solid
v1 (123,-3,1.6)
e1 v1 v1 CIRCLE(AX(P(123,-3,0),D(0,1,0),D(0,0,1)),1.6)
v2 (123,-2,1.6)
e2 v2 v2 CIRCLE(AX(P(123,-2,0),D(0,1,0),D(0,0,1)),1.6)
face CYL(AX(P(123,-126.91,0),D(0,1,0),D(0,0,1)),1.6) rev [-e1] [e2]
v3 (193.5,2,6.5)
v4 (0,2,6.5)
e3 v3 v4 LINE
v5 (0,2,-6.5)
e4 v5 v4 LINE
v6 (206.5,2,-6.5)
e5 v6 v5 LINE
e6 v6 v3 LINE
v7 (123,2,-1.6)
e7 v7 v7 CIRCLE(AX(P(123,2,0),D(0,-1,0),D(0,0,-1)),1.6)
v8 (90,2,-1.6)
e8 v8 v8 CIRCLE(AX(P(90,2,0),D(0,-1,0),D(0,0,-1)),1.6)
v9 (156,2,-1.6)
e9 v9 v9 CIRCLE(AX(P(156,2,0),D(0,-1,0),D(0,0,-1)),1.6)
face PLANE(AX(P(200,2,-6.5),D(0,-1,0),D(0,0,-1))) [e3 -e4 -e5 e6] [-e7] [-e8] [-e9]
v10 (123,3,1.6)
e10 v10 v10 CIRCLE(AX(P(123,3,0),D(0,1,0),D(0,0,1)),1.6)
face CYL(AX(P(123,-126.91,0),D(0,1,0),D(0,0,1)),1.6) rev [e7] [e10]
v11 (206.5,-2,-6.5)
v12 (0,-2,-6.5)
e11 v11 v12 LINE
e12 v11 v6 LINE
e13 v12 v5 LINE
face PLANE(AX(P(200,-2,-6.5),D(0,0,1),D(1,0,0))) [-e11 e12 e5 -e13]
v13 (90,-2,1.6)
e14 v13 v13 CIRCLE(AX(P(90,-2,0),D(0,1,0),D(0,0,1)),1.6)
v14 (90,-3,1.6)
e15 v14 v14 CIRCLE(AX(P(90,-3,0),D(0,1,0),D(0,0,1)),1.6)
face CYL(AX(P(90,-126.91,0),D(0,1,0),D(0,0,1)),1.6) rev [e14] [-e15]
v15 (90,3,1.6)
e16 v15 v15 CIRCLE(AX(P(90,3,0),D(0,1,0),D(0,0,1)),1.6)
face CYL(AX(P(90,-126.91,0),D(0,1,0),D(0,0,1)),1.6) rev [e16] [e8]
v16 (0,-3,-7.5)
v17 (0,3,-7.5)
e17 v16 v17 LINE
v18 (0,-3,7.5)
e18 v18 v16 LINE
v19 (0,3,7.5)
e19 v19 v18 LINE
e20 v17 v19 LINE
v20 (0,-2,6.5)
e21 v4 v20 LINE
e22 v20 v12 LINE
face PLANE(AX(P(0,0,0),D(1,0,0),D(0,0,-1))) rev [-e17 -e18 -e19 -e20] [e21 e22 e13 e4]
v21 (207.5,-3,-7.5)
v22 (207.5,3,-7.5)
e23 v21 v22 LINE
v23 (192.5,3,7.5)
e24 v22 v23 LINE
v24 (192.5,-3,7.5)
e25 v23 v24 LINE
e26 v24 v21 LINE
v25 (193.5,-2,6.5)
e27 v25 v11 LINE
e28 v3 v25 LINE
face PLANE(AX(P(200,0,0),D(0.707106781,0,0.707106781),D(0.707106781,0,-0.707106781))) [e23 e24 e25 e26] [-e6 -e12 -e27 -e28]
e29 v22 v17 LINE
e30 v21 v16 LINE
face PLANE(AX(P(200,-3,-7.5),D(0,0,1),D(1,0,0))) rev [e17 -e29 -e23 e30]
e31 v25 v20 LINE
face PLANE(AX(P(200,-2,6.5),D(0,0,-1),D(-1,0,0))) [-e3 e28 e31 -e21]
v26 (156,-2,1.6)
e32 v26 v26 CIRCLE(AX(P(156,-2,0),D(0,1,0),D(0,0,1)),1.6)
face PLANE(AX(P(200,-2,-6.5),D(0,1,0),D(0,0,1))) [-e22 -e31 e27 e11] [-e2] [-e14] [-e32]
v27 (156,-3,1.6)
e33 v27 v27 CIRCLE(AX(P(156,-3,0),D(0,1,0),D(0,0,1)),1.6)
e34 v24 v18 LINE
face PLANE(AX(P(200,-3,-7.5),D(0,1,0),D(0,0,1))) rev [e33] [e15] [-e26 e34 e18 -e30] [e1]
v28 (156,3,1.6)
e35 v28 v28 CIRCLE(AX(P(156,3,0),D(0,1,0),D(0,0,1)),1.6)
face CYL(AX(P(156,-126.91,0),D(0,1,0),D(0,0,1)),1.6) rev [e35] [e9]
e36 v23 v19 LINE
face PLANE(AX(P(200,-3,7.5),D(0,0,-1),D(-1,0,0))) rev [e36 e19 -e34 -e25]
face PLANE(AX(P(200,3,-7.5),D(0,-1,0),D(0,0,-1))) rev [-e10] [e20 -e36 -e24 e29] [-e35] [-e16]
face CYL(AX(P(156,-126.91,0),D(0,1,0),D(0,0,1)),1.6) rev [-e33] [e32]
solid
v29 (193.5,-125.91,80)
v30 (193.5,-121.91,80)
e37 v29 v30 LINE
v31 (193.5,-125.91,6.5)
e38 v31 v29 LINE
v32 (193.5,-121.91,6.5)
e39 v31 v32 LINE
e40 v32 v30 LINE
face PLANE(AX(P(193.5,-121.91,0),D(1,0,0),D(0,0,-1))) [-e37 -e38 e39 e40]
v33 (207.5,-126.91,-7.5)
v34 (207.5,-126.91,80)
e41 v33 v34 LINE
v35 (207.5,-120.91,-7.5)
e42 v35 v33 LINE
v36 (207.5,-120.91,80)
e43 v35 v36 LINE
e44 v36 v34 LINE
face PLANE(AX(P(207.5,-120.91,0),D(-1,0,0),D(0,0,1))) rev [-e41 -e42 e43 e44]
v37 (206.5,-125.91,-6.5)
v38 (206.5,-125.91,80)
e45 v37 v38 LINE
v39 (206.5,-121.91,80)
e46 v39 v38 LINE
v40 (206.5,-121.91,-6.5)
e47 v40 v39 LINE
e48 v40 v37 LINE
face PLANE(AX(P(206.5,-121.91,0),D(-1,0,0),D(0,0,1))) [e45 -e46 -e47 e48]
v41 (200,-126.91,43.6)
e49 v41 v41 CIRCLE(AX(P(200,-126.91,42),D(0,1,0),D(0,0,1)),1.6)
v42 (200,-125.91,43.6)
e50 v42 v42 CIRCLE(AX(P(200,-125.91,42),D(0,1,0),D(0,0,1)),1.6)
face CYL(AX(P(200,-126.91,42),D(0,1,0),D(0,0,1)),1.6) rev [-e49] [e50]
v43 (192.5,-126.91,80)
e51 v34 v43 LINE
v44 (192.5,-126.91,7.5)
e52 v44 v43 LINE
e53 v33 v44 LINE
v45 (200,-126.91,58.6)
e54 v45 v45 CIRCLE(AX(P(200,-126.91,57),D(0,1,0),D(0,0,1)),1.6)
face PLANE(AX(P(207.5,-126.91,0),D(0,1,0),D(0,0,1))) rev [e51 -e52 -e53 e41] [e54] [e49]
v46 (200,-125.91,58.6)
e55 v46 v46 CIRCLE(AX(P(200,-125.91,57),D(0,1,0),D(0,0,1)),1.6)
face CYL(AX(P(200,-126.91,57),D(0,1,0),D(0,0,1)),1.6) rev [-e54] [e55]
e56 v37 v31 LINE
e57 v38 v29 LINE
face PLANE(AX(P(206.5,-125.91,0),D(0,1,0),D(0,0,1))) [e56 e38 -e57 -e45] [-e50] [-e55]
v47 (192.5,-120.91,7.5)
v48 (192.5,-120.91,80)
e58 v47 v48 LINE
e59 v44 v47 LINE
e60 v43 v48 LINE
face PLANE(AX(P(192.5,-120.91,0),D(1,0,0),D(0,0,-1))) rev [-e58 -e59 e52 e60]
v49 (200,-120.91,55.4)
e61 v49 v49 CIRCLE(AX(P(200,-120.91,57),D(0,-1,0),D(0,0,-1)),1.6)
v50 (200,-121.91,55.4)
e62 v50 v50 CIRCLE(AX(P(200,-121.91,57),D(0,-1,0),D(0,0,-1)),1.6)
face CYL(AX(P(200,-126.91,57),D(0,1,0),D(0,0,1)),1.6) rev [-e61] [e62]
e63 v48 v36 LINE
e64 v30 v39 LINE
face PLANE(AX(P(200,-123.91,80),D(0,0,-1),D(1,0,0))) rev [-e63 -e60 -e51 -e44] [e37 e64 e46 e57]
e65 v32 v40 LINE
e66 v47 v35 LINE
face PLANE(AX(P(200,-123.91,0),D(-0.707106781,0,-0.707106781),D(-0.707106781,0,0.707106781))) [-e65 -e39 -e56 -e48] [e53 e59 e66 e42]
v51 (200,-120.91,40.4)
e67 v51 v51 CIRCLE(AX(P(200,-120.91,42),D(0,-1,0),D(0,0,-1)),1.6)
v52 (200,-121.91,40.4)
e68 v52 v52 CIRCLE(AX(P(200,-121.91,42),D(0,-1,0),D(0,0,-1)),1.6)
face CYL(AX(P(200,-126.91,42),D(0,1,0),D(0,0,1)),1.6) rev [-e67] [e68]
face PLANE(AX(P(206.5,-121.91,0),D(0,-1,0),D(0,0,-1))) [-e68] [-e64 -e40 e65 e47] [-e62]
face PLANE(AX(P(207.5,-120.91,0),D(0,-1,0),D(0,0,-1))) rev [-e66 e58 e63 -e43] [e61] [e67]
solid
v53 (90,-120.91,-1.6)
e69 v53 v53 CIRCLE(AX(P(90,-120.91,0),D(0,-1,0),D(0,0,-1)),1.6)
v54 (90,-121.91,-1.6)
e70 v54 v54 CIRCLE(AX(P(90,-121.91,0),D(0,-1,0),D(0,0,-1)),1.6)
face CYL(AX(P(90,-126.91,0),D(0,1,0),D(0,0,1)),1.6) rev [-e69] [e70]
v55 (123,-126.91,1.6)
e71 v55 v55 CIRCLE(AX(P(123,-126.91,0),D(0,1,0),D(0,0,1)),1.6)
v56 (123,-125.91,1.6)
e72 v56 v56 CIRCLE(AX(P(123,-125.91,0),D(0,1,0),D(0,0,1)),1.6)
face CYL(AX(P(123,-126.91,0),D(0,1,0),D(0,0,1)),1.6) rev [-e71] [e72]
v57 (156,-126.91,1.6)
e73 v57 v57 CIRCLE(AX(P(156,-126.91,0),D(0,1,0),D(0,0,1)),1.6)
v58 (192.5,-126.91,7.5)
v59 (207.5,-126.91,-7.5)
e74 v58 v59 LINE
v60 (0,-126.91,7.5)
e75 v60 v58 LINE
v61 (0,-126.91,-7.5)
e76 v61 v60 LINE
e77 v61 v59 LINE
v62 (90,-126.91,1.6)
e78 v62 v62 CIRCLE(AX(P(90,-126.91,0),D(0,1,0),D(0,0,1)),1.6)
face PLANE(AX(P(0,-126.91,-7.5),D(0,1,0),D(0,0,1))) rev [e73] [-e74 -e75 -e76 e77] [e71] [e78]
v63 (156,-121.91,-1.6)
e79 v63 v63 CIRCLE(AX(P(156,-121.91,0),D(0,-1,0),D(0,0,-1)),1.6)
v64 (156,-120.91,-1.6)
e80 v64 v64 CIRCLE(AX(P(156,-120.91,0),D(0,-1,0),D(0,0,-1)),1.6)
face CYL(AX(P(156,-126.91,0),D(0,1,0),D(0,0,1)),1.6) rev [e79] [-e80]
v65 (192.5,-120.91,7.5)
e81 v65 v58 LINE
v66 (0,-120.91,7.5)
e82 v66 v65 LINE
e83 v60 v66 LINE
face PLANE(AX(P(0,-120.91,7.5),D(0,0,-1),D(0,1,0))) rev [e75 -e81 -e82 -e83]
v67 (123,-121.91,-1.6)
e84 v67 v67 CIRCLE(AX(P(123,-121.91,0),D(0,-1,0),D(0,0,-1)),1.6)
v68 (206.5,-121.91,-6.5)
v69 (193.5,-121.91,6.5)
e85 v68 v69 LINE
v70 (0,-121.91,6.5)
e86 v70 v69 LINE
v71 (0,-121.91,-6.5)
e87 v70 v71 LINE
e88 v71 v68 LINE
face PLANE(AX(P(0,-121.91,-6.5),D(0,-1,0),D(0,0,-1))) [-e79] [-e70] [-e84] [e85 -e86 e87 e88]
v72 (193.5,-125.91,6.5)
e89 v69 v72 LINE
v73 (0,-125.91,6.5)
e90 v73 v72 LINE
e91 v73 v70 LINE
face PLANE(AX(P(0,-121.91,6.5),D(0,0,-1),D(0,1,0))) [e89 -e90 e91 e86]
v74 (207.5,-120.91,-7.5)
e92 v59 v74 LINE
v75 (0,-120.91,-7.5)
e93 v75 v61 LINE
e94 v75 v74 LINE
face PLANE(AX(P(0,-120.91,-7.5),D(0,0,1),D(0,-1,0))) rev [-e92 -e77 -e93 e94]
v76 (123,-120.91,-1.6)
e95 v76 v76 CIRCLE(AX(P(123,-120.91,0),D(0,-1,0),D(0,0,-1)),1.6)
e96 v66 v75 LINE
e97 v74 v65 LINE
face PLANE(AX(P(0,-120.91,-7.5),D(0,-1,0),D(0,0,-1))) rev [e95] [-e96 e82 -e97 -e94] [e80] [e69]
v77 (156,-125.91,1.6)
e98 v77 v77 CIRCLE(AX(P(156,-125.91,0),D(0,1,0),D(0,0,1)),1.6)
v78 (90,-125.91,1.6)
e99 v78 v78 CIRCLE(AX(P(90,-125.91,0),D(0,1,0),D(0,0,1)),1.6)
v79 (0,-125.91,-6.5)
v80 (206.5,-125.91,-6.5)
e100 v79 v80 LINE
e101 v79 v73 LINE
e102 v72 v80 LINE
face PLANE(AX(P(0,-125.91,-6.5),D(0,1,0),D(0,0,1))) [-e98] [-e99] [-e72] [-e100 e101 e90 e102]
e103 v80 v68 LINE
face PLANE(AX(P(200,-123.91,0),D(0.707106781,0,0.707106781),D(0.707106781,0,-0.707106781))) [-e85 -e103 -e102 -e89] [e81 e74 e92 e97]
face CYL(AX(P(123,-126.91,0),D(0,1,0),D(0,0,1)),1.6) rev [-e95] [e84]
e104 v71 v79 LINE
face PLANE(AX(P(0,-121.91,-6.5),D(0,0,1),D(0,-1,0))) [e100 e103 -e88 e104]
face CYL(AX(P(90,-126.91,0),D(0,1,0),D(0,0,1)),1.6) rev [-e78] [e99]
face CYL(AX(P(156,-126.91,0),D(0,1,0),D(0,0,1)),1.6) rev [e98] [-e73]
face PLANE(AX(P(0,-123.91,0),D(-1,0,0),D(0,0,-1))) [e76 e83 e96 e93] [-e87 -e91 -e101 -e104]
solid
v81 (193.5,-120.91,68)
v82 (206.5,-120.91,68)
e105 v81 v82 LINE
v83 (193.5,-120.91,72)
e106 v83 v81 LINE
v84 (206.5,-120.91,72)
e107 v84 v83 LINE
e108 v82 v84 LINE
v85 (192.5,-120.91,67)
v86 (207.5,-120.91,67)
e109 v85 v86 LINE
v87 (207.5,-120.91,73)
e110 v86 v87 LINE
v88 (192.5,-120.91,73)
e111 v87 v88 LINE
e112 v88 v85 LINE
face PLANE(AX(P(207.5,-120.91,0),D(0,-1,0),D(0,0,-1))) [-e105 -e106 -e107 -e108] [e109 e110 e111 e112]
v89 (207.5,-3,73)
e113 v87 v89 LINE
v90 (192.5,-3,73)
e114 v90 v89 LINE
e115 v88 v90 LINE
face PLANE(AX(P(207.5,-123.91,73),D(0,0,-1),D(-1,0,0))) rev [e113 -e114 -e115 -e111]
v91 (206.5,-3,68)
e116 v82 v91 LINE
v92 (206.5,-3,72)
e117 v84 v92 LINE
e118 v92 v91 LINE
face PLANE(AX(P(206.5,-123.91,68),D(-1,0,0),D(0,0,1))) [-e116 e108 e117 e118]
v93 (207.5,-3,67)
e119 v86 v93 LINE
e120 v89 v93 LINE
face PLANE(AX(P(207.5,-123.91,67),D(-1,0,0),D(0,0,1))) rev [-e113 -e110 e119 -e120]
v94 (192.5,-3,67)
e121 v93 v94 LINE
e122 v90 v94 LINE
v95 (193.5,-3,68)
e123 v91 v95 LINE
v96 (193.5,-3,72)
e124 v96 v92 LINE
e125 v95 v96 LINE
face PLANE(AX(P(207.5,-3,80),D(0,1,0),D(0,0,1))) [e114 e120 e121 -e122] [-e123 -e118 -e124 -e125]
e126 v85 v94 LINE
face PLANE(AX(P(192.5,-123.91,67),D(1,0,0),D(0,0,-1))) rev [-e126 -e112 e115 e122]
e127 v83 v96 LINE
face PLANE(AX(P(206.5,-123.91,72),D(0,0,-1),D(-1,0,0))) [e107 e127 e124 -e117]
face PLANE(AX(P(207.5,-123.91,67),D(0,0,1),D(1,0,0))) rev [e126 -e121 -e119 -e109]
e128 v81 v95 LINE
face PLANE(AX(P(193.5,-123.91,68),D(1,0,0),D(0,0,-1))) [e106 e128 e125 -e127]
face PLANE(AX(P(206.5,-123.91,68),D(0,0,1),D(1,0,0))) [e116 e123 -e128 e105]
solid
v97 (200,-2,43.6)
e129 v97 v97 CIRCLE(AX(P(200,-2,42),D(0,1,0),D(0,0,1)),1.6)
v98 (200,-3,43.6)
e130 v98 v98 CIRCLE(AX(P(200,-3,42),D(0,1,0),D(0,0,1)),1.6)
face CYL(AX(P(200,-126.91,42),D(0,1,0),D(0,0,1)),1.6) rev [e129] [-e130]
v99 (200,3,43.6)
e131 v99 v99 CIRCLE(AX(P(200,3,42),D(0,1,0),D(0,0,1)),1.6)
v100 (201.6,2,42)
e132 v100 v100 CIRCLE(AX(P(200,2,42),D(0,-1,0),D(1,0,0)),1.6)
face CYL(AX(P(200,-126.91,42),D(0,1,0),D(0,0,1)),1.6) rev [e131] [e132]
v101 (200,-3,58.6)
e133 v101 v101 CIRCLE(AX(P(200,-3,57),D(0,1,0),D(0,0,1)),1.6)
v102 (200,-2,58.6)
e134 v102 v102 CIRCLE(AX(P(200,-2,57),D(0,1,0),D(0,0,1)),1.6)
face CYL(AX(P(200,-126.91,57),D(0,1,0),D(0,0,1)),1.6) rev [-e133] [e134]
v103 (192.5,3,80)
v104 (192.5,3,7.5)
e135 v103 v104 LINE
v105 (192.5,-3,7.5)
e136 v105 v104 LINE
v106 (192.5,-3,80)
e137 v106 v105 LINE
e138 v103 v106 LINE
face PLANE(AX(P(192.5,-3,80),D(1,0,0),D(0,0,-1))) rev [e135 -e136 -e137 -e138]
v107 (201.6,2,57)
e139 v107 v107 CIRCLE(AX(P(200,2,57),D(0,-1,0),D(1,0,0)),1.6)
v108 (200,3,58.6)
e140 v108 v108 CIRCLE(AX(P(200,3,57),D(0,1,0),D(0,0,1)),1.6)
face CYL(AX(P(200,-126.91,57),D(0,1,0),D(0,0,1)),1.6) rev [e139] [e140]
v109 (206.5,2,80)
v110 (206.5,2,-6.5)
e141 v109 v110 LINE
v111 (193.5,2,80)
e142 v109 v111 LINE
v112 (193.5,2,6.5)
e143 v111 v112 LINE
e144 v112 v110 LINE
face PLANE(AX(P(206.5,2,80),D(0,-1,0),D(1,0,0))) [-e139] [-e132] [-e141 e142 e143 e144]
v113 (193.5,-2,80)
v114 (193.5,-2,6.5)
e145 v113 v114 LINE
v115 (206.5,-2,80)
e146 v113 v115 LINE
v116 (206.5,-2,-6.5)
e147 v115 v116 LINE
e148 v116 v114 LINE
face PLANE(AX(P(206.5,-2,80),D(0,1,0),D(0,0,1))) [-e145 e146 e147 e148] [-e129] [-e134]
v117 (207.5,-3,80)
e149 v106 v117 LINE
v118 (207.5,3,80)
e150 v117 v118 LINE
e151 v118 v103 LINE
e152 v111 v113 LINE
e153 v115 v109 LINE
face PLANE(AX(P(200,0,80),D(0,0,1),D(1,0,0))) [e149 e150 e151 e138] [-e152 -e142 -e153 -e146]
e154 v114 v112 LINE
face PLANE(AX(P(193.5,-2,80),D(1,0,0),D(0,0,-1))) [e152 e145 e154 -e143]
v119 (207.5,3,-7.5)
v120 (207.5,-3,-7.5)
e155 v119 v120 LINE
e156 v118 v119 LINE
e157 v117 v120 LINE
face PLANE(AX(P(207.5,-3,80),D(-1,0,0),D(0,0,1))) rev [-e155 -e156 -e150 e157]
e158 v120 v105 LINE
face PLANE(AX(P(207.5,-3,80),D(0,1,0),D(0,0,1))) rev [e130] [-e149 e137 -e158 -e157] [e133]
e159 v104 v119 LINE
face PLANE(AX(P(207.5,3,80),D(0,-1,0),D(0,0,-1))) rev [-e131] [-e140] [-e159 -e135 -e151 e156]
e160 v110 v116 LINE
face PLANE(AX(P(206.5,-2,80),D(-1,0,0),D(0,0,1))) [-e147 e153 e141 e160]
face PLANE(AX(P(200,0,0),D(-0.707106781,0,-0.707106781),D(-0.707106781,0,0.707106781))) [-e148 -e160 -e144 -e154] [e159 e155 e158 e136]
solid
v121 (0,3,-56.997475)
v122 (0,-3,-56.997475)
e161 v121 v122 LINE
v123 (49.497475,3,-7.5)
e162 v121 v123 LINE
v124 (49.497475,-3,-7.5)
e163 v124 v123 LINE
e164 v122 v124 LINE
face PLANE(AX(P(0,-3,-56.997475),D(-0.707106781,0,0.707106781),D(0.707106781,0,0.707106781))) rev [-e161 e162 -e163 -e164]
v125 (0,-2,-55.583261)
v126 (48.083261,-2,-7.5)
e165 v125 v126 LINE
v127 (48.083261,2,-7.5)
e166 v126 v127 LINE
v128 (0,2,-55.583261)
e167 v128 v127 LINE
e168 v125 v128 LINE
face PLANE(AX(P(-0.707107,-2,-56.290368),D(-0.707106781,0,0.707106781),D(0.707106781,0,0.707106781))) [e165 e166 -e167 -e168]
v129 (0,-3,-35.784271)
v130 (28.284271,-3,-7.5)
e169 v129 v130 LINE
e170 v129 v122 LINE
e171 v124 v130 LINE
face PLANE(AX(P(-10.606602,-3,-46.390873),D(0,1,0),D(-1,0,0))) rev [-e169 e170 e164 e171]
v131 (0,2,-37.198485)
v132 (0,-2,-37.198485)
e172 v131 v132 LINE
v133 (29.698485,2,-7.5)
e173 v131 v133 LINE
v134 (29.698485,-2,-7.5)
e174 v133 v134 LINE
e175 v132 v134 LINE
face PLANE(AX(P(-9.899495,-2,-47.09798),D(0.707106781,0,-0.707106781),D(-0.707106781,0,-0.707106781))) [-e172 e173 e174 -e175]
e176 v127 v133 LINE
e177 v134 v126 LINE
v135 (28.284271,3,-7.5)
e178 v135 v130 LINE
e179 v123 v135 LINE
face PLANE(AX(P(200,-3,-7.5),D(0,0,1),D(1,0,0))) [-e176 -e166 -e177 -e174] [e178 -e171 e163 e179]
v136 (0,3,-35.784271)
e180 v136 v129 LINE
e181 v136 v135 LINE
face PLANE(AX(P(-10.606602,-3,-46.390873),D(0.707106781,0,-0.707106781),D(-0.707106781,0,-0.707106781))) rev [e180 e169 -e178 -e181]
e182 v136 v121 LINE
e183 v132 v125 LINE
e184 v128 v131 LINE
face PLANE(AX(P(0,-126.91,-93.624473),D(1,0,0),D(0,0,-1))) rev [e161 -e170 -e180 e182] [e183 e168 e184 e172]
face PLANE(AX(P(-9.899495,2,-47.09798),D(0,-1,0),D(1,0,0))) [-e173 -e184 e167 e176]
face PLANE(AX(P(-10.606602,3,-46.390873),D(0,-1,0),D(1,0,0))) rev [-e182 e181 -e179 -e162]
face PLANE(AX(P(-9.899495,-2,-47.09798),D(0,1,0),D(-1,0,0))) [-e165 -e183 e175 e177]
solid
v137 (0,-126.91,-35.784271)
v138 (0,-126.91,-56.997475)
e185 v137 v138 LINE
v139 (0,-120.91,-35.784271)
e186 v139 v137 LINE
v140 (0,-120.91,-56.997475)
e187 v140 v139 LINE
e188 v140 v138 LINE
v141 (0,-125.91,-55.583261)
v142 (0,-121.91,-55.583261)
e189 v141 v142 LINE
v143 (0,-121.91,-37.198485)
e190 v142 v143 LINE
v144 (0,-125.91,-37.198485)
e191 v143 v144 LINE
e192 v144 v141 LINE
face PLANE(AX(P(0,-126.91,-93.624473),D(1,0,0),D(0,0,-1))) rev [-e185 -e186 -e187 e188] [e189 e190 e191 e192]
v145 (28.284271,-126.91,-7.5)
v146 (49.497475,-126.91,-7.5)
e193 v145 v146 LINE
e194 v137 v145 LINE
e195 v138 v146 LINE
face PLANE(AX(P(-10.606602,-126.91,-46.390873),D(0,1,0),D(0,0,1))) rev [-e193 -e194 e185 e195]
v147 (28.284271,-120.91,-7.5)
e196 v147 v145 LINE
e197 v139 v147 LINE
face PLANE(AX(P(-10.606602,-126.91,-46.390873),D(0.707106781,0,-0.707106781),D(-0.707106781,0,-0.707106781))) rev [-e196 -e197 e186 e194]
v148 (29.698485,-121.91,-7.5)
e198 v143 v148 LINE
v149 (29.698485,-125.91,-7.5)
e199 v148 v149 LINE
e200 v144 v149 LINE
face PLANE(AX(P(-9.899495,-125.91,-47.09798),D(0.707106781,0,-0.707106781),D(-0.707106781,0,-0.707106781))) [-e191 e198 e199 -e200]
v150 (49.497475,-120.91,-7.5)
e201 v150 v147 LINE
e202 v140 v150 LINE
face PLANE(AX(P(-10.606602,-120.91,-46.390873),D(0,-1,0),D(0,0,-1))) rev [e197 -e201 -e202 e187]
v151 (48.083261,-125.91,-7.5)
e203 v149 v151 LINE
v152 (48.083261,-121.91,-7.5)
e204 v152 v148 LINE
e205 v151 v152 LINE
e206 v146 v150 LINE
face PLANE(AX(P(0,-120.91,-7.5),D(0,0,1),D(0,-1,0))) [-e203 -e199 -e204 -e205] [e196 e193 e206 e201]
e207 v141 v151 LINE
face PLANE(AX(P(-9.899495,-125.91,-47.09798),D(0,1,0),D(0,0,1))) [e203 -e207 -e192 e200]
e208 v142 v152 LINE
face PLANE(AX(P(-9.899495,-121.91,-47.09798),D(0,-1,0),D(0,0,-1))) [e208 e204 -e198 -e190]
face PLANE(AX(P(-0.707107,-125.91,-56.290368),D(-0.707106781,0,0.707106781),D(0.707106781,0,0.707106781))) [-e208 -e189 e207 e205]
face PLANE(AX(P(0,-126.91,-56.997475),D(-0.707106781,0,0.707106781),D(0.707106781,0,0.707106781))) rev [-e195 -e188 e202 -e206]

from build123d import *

# Parameters (mm, degrees)
F_20_START                   = -3
F_20_X_20_X_2_1_DEPTH        = 1
F_20_START_2                 = 2
F_20_X_20_X_2_1_2_DEPTH      = 1
F_20_START_3                 = -2
F_20_X_20_X_2_1_3_DEPTH      = 4
F_20_X_20_X_2_1_4_DEPTH      = 1
F_20_X_20_X_2_1_5_DEPTH      = 1
F_20_X_20_X_2_1_6_DEPTH      = 4
F_20_START_4                 = -126.91
F_20_X_20_X_2_1_7_DEPTH      = 1
F_20_START_5                 = -121.91
F_20_X_20_X_2_1_8_DEPTH      = 1
F_20_START_6                 = -125.91
F_20_X_20_X_2_1_9_DEPTH      = 4
F_20_X_20_X_2_1_10_DEPTH     = 1
F_20_X_20_X_2_1_11_DEPTH     = 1
F_20_X_20_X_2_1_12_DEPTH     = 4
F_20_START_7                 = 192.5
F_20_X_20_X_2_1_13_OUTLINE_W = 117.91
F_20_X_20_X_2_1_13_OUTLINE_H = 1
F_20_X_20_X_2_1_13_DEPTH     = 15
F_20_X_20_X_2_1_14_OUTLINE_W = 117.91
F_20_X_20_X_2_1_14_OUTLINE_H = 4
F_20_X_20_X_2_1_14_DEPTH     = 1
F_20_START_8                 = 206.5
F_20_X_20_X_2_1_15_OUTLINE_W = 117.91
F_20_X_20_X_2_1_15_OUTLINE_H = 4
F_20_X_20_X_2_1_15_DEPTH     = 1
F_20_X_20_X_2_1_16_DEPTH     = 1
F_20_X_20_X_2_1_17_DEPTH     = 1
F_20_X_20_X_2_1_18_DEPTH     = 4
F_20_X_20_X_2_1_19_DEPTH     = 1
F_20_X_20_X_2_1_20_DEPTH     = 1
F_20_X_20_X_2_1_21_DEPTH     = 4
SKETCH_1_W                   = 27.555154476
SKETCH_1_H                   = 101.124473491
CUT_EXTRUDE_1_DEPTH          = 258.551661031
SKETCH_2_R                   = 1.6
CUT_EXTRUDE_2_DEPTH          = 258.551661031


# Read off the part's stored shape, not the designer's step: 方形管 20 X 20 X 2(1)
with BuildPart() as part:
    # 方形管 20 X 20 X 2(1) outline → 方形管 20 X 20 X 2(1) (new body)
    with BuildSketch(Plane(origin=(0, 0, 0), x_dir=(1, 0, 0), z_dir=(0, 1, 0)).offset(F_20_START)):
        Polygon((192.5, -7.5), (192.5, -80), (207.5, -80), (207.5, 7.5), align=None)
    extrude(amount=F_20_X_20_X_2_1_DEPTH)

    # 20 X 20 X 2_1 2 outline → 20 X 20 X 2_1 2 (add)
    with BuildSketch(Plane(origin=(0, 0, 0), x_dir=(1, 0, 0), z_dir=(0, 1, 0)).offset(F_20_START_2)):
        Polygon((192.5, -7.5), (192.5, -80), (207.5, -80), (207.5, 7.5), align=None)
    extrude(amount=F_20_X_20_X_2_1_2_DEPTH)

    # 20 X 20 X 2_1 3 outline → 20 X 20 X 2_1 3 (add)
    with BuildSketch(Plane(origin=(0, 0, 0), x_dir=(1, 0, 0), z_dir=(0, 1, 0)).offset(F_20_START_3)):
        Polygon((192.5, -7.5), (192.5, -80), (193.5, -80), (193.5, -6.5), align=None)
        Polygon((206.5, 6.5), (206.5, -80), (207.5, -80), (207.5, 7.5), align=None)
    extrude(amount=F_20_X_20_X_2_1_3_DEPTH)


with BuildPart() as body_2:
    # 20 X 20 X 2_1 4 outline → 20 X 20 X 2_1 4 (new body)
    with BuildSketch(Plane(origin=(0, 0, 0), x_dir=(1, 0, 0), z_dir=(0, 1, 0)).offset(F_20_START)):
        Polygon((0, -7.5), (192.5, -7.5), (207.5, 7.5), (0, 7.5), align=None)
    extrude(amount=F_20_X_20_X_2_1_4_DEPTH)

    # 20 X 20 X 2_1 5 outline → 20 X 20 X 2_1 5 (add)
    with BuildSketch(Plane(origin=(0, 0, 0), x_dir=(1, 0, 0), z_dir=(0, 1, 0)).offset(F_20_START_2)):
        Polygon((0, -7.5), (192.5, -7.5), (207.5, 7.5), (0, 7.5), align=None)
    extrude(amount=F_20_X_20_X_2_1_5_DEPTH)

    # 20 X 20 X 2_1 6 outline → 20 X 20 X 2_1 6 (add)
    with BuildSketch(Plane(origin=(0, 0, 0), x_dir=(1, 0, 0), z_dir=(0, 1, 0)).offset(F_20_START_3)):
        Polygon((0, -7.5), (192.5, -7.5), (193.5, -6.5), (0, -6.5), align=None)
        Polygon((0, 6.5), (206.5, 6.5), (207.5, 7.5), (0, 7.5), align=None)
    extrude(amount=F_20_X_20_X_2_1_6_DEPTH)


with BuildPart() as body_3:
    # 20 X 20 X 2_1 7 outline → 20 X 20 X 2_1 7 (new body)
    with BuildSketch(Plane(origin=(0, 0, 0), x_dir=(1, 0, 0), z_dir=(0, 1, 0)).offset(F_20_START_4)):
        Polygon((0, -7.5), (192.5, -7.5), (207.5, 7.5), (0, 7.5), align=None)
    extrude(amount=F_20_X_20_X_2_1_7_DEPTH)

    # 20 X 20 X 2_1 8 outline → 20 X 20 X 2_1 8 (add)
    with BuildSketch(Plane(origin=(0, 0, 0), x_dir=(1, 0, 0), z_dir=(0, 1, 0)).offset(F_20_START_5)):
        Polygon((0, -7.5), (192.5, -7.5), (207.5, 7.5), (0, 7.5), align=None)
    extrude(amount=F_20_X_20_X_2_1_8_DEPTH)

    # 20 X 20 X 2_1 9 outline → 20 X 20 X 2_1 9 (add)
    with BuildSketch(Plane(origin=(0, 0, 0), x_dir=(1, 0, 0), z_dir=(0, 1, 0)).offset(F_20_START_6)):
        Polygon((0, -7.5), (192.5, -7.5), (193.5, -6.5), (0, -6.5), align=None)
        Polygon((0, 6.5), (206.5, 6.5), (207.5, 7.5), (0, 7.5), align=None)
    extrude(amount=F_20_X_20_X_2_1_9_DEPTH)


with BuildPart() as body_4:
    # 20 X 20 X 2_1 10 outline → 20 X 20 X 2_1 10 (new body)
    with BuildSketch(Plane(origin=(0, 0, 0), x_dir=(1, 0, 0), z_dir=(0, 1, 0)).offset(F_20_START_4)):
        Polygon((192.5, -7.5), (192.5, -80), (207.5, -80), (207.5, 7.5), align=None)
    extrude(amount=F_20_X_20_X_2_1_10_DEPTH)

    # 20 X 20 X 2_1 11 outline → 20 X 20 X 2_1 11 (add)
    with BuildSketch(Plane(origin=(0, 0, 0), x_dir=(1, 0, 0), z_dir=(0, 1, 0)).offset(F_20_START_5)):
        Polygon((192.5, -7.5), (192.5, -80), (207.5, -80), (207.5, 7.5), align=None)
    extrude(amount=F_20_X_20_X_2_1_11_DEPTH)

    # 20 X 20 X 2_1 12 outline → 20 X 20 X 2_1 12 (add)
    with BuildSketch(Plane(origin=(0, 0, 0), x_dir=(1, 0, 0), z_dir=(0, 1, 0)).offset(F_20_START_6)):
        Polygon((192.5, -7.5), (192.5, -80), (193.5, -80), (193.5, -6.5), align=None)
        Polygon((206.5, 6.5), (206.5, -80), (207.5, -80), (207.5, 7.5), align=None)
    extrude(amount=F_20_X_20_X_2_1_12_DEPTH)


with BuildPart() as body_5:
    # 20 X 20 X 2_1 13 outline → 20 X 20 X 2_1 13 (new body)
    with BuildSketch(Plane.YZ.offset(F_20_START_7)):
        with Locations((-61.955, 72.5)):
            Rectangle(F_20_X_20_X_2_1_13_OUTLINE_W, F_20_X_20_X_2_1_13_OUTLINE_H)
        with Locations((-61.955, 67.5)):
            Rectangle(F_20_X_20_X_2_1_13_OUTLINE_W, F_20_X_20_X_2_1_13_OUTLINE_H)
    extrude(amount=F_20_X_20_X_2_1_13_DEPTH)

    # 20 X 20 X 2_1 14 outline → 20 X 20 X 2_1 14 (add)
    with BuildSketch(Plane.YZ.offset(F_20_START_7)):
        with Locations((-61.955, 70)):
            Rectangle(F_20_X_20_X_2_1_14_OUTLINE_W, F_20_X_20_X_2_1_14_OUTLINE_H)
    extrude(amount=F_20_X_20_X_2_1_14_DEPTH)

    # 20 X 20 X 2_1 15 outline → 20 X 20 X 2_1 15 (add)
    with BuildSketch(Plane.YZ.offset(F_20_START_8)):
        with Locations((-61.955, 70)):
            Rectangle(F_20_X_20_X_2_1_15_OUTLINE_W, F_20_X_20_X_2_1_15_OUTLINE_H)
    extrude(amount=F_20_X_20_X_2_1_15_DEPTH)


with BuildPart() as body_6:
    # 20 X 20 X 2_1 16 outline → 20 X 20 X 2_1 16 (new body)
    with BuildSketch(Plane(origin=(0, 0, 0), x_dir=(1, 0, 0), z_dir=(0, 1, 0)).offset(F_20_START)):
        Polygon((28.284271247, 7.5), (49.497474683, 7.5), (0, 56.997474683), (-10.606601718, 46.390872965), align=None)
    extrude(amount=F_20_X_20_X_2_1_16_DEPTH)

    # 20 X 20 X 2_1 17 outline → 20 X 20 X 2_1 17 (add)
    with BuildSketch(Plane(origin=(0, 0, 0), x_dir=(1, 0, 0), z_dir=(0, 1, 0)).offset(F_20_START_2)):
        Polygon((28.284271247, 7.5), (49.497474683, 7.5), (0, 56.997474683), (-10.606601718, 46.390872965), align=None)
    extrude(amount=F_20_X_20_X_2_1_17_DEPTH)

    # 20 X 20 X 2_1 18 outline → 20 X 20 X 2_1 18 (add)
    with BuildSketch(Plane(origin=(0, 0, 0), x_dir=(1, 0, 0), z_dir=(0, 1, 0)).offset(F_20_START_3)):
        Polygon((28.284271247, 7.5), (29.69848481, 7.5), (-9.899494937, 47.097979746), (-10.606601718, 46.390872965), align=None)
        Polygon((-0.707106781, 56.290367902), (48.083261121, 7.5), (49.497474683, 7.5), (0, 56.997474683), align=None)
    extrude(amount=F_20_X_20_X_2_1_18_DEPTH)


with BuildPart() as body_7:
    # 20 X 20 X 2_1 19 outline → 20 X 20 X 2_1 19 (new body)
    with BuildSketch(Plane(origin=(0, 0, 0), x_dir=(1, 0, 0), z_dir=(0, 1, 0)).offset(F_20_START_4)):
        Polygon((28.284271247, 7.5), (49.497474683, 7.5), (0, 56.997474683), (-10.606601718, 46.390872965), align=None)
    extrude(amount=F_20_X_20_X_2_1_19_DEPTH)

    # 20 X 20 X 2_1 20 outline → 20 X 20 X 2_1 20 (add)
    with BuildSketch(Plane(origin=(0, 0, 0), x_dir=(1, 0, 0), z_dir=(0, 1, 0)).offset(F_20_START_5)):
        Polygon((28.284271247, 7.5), (49.497474683, 7.5), (0, 56.997474683), (-10.606601718, 46.390872965), align=None)
    extrude(amount=F_20_X_20_X_2_1_20_DEPTH)

    # 20 X 20 X 2_1 21 outline → 20 X 20 X 2_1 21 (add)
    with BuildSketch(Plane(origin=(0, 0, 0), x_dir=(1, 0, 0), z_dir=(0, 1, 0)).offset(F_20_START_6)):
        Polygon((28.284271247, 7.5), (29.69848481, 7.5), (-9.899494937, 47.097979746), (-10.606601718, 46.390872965), align=None)
        Polygon((-0.707106781, 56.290367902), (48.083261121, 7.5), (49.497474683, 7.5), (0, 56.997474683), align=None)
    extrude(amount=F_20_X_20_X_2_1_21_DEPTH)


with BuildPart() as cut_extrude_1_tool:
    # 草图1 → 切除-拉伸1 (new, through all)
    with BuildSketch(Plane(origin=(0, 3, 0), x_dir=(1, 0, 0), z_dir=(0, 1, 0))):
        with Locations((-13.777577238, 43.062236746)):
            Rectangle(SKETCH_1_W, SKETCH_1_H)
    extrude(amount=-CUT_EXTRUDE_1_DEPTH)


with BuildPart() as body_6_1:
    add(body_6.part)

    # 切除-拉伸1: cut by cut_extrude_1_tool
    add(cut_extrude_1_tool.part, mode=Mode.SUBTRACT)


with BuildPart() as body_7_1:
    add(body_7.part)

    # 切除-拉伸1: cut by cut_extrude_1_tool
    add(cut_extrude_1_tool.part, mode=Mode.SUBTRACT)


with BuildPart() as cut_extrude_2_tool:
    # 草图2 → 切除-拉伸2 (new, through all)
    with BuildSketch(Plane(origin=(0, 3, 0), x_dir=(1, 0, 0), z_dir=(0, 1, 0))):
        with Locations(Location((200, -57, 0), (0, 0, 270))):
            Circle(SKETCH_2_R)
        with Locations(Location((200, -42, 0), (0, 0, 270))):
            Circle(SKETCH_2_R)
        with Locations(Location((156, 0, 0), (0, 0, 270))):
            Circle(SKETCH_2_R)
        with Locations(Location((123, 0, 0), (0, 0, 270))):
            Circle(SKETCH_2_R)
        with Locations(Location((90, 0, 0), (0, 0, 270))):
            Circle(SKETCH_2_R)
    extrude(amount=-CUT_EXTRUDE_2_DEPTH)


with BuildPart() as part_1:
    add(part.part)

    # 切除-拉伸2: cut by cut_extrude_2_tool
    add(cut_extrude_2_tool.part, mode=Mode.SUBTRACT)


with BuildPart() as body_2_1:
    add(body_2.part)

    # 切除-拉伸2: cut by cut_extrude_2_tool
    add(cut_extrude_2_tool.part, mode=Mode.SUBTRACT)


with BuildPart() as body_3_1:
    add(body_3.part)

    # 切除-拉伸2: cut by cut_extrude_2_tool
    add(cut_extrude_2_tool.part, mode=Mode.SUBTRACT)


with BuildPart() as body_4_1:
    add(body_4.part)

    # 切除-拉伸2: cut by cut_extrude_2_tool
    add(cut_extrude_2_tool.part, mode=Mode.SUBTRACT)


solid = Compound([body_5.part, body_6_1.part, body_7_1.part, part_1.part, body_2_1.part, body_3_1.part, body_4_1.part])
